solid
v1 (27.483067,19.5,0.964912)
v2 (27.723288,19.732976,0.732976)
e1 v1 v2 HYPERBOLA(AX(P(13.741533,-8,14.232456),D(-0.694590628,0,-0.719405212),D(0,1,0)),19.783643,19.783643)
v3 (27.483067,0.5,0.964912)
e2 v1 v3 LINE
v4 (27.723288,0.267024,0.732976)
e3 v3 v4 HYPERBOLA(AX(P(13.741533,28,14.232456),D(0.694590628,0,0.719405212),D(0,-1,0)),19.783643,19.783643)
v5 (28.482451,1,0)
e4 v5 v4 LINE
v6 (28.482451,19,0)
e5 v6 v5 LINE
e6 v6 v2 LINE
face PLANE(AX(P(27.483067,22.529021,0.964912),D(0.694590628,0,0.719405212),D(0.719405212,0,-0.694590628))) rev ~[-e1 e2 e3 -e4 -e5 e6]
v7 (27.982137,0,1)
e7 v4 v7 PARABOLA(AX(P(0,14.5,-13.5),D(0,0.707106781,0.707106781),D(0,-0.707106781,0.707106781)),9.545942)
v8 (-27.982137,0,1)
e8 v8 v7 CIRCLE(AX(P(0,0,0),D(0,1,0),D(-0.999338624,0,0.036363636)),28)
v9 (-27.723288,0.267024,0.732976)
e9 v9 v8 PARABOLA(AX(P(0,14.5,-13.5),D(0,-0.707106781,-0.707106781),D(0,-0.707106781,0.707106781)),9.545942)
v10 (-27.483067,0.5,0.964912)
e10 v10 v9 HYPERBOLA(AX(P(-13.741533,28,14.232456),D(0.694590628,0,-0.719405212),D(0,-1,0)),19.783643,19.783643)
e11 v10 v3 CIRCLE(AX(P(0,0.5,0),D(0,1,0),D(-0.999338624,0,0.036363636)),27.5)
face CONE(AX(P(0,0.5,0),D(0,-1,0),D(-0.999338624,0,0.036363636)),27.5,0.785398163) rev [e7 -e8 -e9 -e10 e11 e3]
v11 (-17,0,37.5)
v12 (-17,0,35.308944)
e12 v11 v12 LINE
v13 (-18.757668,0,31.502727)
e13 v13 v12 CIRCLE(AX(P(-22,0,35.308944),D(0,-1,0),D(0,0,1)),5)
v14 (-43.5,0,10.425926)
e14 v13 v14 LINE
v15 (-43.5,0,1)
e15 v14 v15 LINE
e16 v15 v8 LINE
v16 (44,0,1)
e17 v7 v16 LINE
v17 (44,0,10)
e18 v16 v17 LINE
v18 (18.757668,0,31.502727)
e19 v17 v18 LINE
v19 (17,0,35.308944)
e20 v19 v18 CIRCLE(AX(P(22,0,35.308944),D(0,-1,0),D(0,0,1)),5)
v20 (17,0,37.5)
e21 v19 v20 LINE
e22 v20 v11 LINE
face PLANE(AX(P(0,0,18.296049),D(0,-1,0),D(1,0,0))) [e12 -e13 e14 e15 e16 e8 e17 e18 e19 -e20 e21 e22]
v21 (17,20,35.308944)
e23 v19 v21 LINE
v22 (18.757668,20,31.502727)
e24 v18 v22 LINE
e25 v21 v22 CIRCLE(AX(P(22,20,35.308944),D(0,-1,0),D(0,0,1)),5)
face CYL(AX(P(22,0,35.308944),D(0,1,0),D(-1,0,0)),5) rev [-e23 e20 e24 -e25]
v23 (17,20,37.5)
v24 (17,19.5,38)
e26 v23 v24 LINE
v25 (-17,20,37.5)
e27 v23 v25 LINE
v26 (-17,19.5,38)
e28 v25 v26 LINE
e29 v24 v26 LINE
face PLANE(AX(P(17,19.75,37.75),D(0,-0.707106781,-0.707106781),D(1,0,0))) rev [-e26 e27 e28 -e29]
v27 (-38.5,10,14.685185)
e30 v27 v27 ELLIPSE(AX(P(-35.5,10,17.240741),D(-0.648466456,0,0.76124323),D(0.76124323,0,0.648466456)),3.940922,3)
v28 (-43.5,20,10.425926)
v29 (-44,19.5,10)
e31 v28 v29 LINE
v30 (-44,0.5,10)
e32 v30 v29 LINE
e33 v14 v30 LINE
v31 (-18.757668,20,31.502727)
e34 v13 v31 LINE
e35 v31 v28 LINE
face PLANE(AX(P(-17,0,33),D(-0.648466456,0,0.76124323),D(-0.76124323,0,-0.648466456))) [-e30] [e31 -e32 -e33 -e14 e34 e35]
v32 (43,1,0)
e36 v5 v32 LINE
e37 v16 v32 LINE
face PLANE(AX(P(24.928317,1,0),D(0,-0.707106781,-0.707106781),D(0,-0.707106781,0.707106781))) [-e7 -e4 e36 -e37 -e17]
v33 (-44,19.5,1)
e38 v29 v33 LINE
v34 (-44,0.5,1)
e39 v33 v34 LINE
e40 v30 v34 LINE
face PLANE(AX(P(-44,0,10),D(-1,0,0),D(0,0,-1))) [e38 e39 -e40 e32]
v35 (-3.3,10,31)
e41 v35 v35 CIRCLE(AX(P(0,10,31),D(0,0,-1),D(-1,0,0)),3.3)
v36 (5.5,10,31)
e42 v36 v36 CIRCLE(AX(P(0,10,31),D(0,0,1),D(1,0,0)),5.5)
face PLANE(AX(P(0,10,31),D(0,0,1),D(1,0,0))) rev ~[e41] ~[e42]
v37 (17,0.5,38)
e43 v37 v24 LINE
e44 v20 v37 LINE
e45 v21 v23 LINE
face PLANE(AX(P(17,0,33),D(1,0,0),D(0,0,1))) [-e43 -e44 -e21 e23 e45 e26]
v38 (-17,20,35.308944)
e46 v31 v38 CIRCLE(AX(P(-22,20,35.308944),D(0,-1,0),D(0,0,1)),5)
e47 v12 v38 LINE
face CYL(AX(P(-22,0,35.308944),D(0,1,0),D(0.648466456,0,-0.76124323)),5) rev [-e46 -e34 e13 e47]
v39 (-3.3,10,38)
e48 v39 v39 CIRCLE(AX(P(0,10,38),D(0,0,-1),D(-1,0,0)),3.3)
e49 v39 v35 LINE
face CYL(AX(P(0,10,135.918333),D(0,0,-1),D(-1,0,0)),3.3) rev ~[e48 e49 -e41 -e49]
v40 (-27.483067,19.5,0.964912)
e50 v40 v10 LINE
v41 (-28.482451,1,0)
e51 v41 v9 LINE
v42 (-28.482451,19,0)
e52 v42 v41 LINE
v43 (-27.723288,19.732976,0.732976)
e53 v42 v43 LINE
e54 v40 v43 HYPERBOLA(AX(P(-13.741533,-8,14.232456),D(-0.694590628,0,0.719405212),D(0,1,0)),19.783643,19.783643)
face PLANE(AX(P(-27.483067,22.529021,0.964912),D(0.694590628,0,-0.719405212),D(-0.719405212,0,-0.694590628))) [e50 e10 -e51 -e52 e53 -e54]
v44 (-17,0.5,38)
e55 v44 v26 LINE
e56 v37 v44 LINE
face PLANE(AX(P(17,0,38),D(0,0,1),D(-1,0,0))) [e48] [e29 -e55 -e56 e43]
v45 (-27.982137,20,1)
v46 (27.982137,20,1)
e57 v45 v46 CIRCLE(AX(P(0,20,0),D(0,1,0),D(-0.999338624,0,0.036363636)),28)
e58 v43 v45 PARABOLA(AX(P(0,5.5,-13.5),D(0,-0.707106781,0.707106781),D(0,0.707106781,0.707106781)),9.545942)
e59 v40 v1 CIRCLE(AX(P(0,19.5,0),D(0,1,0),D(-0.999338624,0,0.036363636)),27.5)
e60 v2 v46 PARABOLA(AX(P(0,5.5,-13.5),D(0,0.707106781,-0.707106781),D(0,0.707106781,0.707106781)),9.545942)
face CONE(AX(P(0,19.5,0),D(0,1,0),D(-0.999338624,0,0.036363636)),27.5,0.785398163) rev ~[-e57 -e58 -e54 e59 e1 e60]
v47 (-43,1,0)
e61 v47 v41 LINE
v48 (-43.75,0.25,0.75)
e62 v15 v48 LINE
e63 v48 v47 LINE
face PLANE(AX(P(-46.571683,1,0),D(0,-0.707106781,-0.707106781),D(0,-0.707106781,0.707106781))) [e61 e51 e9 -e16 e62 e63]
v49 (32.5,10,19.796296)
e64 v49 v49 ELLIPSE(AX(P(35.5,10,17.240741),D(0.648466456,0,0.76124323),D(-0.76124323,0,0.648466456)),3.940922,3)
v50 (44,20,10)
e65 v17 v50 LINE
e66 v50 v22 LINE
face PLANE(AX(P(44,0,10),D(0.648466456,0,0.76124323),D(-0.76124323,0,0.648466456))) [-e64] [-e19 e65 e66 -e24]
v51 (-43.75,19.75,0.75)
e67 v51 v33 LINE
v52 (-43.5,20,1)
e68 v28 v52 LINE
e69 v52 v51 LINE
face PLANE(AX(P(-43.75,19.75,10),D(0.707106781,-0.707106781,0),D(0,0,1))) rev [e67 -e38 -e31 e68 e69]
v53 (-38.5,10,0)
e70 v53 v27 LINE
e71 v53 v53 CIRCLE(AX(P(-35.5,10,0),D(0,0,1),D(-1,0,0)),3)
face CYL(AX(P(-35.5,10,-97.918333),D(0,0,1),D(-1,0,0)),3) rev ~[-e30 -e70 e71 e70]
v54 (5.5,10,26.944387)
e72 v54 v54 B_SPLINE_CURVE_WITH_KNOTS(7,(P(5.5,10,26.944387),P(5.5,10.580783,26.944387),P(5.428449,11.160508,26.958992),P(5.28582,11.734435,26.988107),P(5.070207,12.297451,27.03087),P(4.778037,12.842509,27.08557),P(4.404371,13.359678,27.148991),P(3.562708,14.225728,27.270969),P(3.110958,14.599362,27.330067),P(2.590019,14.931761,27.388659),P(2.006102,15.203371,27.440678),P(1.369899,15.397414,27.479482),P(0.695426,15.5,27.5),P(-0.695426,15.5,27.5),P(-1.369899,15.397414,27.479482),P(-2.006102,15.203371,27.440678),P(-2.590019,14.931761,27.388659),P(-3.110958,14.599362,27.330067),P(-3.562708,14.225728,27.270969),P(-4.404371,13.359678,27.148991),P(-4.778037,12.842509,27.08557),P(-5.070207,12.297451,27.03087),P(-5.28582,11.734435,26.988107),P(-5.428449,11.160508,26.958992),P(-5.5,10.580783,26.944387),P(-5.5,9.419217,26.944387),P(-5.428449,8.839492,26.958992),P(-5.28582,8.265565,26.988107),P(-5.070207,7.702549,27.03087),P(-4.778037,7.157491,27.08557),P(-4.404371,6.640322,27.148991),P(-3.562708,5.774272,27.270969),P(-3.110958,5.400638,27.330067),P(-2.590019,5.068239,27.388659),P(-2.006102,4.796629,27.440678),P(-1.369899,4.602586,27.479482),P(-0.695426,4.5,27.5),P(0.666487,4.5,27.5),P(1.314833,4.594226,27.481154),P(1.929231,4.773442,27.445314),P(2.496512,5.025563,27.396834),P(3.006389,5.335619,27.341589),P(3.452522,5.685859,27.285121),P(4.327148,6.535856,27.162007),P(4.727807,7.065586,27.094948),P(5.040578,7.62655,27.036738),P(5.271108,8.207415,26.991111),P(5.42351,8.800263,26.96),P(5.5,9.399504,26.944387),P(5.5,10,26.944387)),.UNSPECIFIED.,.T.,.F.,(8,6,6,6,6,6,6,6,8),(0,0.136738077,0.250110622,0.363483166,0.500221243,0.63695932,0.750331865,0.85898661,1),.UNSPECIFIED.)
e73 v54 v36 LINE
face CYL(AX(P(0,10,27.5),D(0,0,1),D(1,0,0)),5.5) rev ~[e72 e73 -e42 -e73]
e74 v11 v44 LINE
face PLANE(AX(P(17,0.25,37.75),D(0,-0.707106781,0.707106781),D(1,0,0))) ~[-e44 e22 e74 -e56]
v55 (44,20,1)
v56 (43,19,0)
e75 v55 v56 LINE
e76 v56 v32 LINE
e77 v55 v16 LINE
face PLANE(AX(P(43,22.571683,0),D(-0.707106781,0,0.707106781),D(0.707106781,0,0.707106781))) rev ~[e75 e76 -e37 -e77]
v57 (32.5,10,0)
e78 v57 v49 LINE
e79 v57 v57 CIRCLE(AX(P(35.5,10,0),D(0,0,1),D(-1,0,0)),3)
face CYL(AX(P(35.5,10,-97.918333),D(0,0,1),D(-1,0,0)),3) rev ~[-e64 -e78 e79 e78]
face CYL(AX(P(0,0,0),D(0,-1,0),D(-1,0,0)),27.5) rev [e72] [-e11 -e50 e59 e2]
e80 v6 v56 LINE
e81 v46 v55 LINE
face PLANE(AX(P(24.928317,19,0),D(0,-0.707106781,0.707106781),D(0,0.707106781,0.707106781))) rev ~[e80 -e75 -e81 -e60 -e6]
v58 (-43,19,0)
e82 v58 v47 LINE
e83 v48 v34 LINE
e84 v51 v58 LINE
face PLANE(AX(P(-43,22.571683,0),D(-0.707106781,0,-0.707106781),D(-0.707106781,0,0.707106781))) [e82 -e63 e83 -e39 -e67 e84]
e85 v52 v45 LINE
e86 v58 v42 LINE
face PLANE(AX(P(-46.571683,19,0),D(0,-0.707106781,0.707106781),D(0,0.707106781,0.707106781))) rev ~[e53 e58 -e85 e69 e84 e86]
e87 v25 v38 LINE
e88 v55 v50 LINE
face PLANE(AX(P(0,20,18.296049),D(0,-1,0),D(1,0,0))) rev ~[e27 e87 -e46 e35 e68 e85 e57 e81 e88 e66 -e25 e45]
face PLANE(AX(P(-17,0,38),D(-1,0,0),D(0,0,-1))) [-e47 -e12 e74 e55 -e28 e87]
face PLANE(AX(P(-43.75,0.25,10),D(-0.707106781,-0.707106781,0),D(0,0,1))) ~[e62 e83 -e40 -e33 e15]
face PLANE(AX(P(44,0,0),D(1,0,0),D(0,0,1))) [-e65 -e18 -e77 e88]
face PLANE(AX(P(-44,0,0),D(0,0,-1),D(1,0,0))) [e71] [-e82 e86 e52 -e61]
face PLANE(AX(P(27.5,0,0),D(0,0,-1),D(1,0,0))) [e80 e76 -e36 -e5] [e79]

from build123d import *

# Parameters (mm, degrees)
F1_DEPTH    = 20
F3_D        = 6
F4_T1_DEPTH = 21.6433659759
F4_T3_DEPTH = 21.6433659759
F4_T5_DEPTH = 25.0580427678
F4_T7_DEPTH = 25.1433659759
F5_SIZE     = 0.5
F7_D        = 6.6
F9_R        = 5.5
F10_DEPTH   = 3.5
F11_R       = 5


# Not quite as in the source:
# - a fillet or chamfer that OpenCascade refuses, or shapes differently, is made with other operations: its cross-section is extruded or revolved along the edge and cut away or added
# - a feature names something its author has since deleted; it is built from what else it names


with BuildPart() as f1:
    # F0 (on Front) → F1 (new body)
    with BuildSketch(Plane.XZ):
        with BuildLine():
            ThreePointArc((-27.5, 0), (0, 27.5), (27.5, 0))
            Line((27.5, 0), (44, 0))
            Line((44, 0), (44, 10))
            Line((44, 10), (17, 33))
            Line((17, 33), (17, 38))
            Line((17, 38), (-17, 38))
            Line((-17, 38), (-17, 33))
            Line((-17, 33), (-44, 10))
            Line((-44, 10), (-44, 0))
            Line((-44, 0), (-27.5, 0))
        make_face()
    extrude(amount=-F1_DEPTH)

    # F3 (through all)
    with Locations(Plane(origin=(0, 0, 0), x_dir=(1, 0, 0), z_dir=(0, 0, -1))):
        with Locations((-35.5, -10), (35.5, -10)):
            Hole(F3_D / 2)

    # F4: chamfer of 1 on 8 edges, made by hand

    # F4_s2 → F4_t1 (cut)
    with BuildSketch(Plane.YZ.offset(24.928317012)):
        Polygon((19, 0), (20, 1), (20, 0), align=None)
        Polygon((1, 0), (0, 1), (0, 0), align=None)
    extrude(amount=F4_T1_DEPTH, mode=Mode.SUBTRACT)

    # F4_s4 → F4_t3 (cut)
    with BuildSketch(Plane.YZ.offset(-46.571682988)):
        Polygon((19, 0), (20, 1), (20, 0), align=None)
        Polygon((1, 0), (0, 1), (0, 0), align=None)
    extrude(amount=F4_T3_DEPTH, mode=Mode.SUBTRACT)

    # F4_s6 → F4_t5 (cut)
    with BuildSketch(Plane.XZ.offset(-22.5290213839)):
        with BuildLine():
            Line((-27.4830665009, 0.9649122807), (-28.4824507373, 0))
            Line((-28.4824507373, 0), (-27.5, 0))
            ThreePointArc((-27.5, 0), (-27.4955143469, 0.4966797747), (-27.4830665009, 0.9649122807))
        make_face()
        with BuildLine():
            Line((27.4830665009, 0.9649122807), (28.4824507373, 0))
            Line((28.4824507373, 0), (27.5, 0))
            ThreePointArc((27.5, 0), (27.4955143469, 0.4966797747), (27.4830665009, 0.9649122807))
        make_face()
    extrude(amount=F4_T5_DEPTH, mode=Mode.SUBTRACT)

    # F4_s8 → F4_t7 (cut)
    with BuildSketch(Plane.XZ.offset(-22.571682988)):
        Polygon((-43, 0), (-44, 1), (-44, 0), align=None)
        Polygon((43, 0), (44, 1), (44, 0), align=None)
    extrude(amount=F4_T7_DEPTH, mode=Mode.SUBTRACT)

    # F5
    f5_edges = [f1.edges().sort_by_distance(p)[0] for p in [
        (0, 20, 38),
        (0, 0, 38),
        (0, 20, 27.5),
        (-44, 20, 5.5),
        (0, 0, 27.5),
        (-44, 0, 5.5),
    ]]
    chamfer(f5_edges, length=F5_SIZE)

    # F7 (through all)
    with Locations(Plane.XY.offset(38)):
        with Locations((0, 10)):
            Hole(F7_D / 2)

    # F9 (on offset) → F10 (cut, symmetric)
    with BuildSketch(Plane.XY.offset(27.5)):
        with Locations((0, 10)):
            Circle(F9_R)
    extrude(amount=F10_DEPTH, both=True, mode=Mode.SUBTRACT)

    # F11
    f11_edges = [f1.edges().sort_by_distance(p)[0] for p in [
        (-17, 10, 33),
        (17, 10, 33),
    ]]
    fillet(f11_edges, radius=F11_R)


solid = f1.part
